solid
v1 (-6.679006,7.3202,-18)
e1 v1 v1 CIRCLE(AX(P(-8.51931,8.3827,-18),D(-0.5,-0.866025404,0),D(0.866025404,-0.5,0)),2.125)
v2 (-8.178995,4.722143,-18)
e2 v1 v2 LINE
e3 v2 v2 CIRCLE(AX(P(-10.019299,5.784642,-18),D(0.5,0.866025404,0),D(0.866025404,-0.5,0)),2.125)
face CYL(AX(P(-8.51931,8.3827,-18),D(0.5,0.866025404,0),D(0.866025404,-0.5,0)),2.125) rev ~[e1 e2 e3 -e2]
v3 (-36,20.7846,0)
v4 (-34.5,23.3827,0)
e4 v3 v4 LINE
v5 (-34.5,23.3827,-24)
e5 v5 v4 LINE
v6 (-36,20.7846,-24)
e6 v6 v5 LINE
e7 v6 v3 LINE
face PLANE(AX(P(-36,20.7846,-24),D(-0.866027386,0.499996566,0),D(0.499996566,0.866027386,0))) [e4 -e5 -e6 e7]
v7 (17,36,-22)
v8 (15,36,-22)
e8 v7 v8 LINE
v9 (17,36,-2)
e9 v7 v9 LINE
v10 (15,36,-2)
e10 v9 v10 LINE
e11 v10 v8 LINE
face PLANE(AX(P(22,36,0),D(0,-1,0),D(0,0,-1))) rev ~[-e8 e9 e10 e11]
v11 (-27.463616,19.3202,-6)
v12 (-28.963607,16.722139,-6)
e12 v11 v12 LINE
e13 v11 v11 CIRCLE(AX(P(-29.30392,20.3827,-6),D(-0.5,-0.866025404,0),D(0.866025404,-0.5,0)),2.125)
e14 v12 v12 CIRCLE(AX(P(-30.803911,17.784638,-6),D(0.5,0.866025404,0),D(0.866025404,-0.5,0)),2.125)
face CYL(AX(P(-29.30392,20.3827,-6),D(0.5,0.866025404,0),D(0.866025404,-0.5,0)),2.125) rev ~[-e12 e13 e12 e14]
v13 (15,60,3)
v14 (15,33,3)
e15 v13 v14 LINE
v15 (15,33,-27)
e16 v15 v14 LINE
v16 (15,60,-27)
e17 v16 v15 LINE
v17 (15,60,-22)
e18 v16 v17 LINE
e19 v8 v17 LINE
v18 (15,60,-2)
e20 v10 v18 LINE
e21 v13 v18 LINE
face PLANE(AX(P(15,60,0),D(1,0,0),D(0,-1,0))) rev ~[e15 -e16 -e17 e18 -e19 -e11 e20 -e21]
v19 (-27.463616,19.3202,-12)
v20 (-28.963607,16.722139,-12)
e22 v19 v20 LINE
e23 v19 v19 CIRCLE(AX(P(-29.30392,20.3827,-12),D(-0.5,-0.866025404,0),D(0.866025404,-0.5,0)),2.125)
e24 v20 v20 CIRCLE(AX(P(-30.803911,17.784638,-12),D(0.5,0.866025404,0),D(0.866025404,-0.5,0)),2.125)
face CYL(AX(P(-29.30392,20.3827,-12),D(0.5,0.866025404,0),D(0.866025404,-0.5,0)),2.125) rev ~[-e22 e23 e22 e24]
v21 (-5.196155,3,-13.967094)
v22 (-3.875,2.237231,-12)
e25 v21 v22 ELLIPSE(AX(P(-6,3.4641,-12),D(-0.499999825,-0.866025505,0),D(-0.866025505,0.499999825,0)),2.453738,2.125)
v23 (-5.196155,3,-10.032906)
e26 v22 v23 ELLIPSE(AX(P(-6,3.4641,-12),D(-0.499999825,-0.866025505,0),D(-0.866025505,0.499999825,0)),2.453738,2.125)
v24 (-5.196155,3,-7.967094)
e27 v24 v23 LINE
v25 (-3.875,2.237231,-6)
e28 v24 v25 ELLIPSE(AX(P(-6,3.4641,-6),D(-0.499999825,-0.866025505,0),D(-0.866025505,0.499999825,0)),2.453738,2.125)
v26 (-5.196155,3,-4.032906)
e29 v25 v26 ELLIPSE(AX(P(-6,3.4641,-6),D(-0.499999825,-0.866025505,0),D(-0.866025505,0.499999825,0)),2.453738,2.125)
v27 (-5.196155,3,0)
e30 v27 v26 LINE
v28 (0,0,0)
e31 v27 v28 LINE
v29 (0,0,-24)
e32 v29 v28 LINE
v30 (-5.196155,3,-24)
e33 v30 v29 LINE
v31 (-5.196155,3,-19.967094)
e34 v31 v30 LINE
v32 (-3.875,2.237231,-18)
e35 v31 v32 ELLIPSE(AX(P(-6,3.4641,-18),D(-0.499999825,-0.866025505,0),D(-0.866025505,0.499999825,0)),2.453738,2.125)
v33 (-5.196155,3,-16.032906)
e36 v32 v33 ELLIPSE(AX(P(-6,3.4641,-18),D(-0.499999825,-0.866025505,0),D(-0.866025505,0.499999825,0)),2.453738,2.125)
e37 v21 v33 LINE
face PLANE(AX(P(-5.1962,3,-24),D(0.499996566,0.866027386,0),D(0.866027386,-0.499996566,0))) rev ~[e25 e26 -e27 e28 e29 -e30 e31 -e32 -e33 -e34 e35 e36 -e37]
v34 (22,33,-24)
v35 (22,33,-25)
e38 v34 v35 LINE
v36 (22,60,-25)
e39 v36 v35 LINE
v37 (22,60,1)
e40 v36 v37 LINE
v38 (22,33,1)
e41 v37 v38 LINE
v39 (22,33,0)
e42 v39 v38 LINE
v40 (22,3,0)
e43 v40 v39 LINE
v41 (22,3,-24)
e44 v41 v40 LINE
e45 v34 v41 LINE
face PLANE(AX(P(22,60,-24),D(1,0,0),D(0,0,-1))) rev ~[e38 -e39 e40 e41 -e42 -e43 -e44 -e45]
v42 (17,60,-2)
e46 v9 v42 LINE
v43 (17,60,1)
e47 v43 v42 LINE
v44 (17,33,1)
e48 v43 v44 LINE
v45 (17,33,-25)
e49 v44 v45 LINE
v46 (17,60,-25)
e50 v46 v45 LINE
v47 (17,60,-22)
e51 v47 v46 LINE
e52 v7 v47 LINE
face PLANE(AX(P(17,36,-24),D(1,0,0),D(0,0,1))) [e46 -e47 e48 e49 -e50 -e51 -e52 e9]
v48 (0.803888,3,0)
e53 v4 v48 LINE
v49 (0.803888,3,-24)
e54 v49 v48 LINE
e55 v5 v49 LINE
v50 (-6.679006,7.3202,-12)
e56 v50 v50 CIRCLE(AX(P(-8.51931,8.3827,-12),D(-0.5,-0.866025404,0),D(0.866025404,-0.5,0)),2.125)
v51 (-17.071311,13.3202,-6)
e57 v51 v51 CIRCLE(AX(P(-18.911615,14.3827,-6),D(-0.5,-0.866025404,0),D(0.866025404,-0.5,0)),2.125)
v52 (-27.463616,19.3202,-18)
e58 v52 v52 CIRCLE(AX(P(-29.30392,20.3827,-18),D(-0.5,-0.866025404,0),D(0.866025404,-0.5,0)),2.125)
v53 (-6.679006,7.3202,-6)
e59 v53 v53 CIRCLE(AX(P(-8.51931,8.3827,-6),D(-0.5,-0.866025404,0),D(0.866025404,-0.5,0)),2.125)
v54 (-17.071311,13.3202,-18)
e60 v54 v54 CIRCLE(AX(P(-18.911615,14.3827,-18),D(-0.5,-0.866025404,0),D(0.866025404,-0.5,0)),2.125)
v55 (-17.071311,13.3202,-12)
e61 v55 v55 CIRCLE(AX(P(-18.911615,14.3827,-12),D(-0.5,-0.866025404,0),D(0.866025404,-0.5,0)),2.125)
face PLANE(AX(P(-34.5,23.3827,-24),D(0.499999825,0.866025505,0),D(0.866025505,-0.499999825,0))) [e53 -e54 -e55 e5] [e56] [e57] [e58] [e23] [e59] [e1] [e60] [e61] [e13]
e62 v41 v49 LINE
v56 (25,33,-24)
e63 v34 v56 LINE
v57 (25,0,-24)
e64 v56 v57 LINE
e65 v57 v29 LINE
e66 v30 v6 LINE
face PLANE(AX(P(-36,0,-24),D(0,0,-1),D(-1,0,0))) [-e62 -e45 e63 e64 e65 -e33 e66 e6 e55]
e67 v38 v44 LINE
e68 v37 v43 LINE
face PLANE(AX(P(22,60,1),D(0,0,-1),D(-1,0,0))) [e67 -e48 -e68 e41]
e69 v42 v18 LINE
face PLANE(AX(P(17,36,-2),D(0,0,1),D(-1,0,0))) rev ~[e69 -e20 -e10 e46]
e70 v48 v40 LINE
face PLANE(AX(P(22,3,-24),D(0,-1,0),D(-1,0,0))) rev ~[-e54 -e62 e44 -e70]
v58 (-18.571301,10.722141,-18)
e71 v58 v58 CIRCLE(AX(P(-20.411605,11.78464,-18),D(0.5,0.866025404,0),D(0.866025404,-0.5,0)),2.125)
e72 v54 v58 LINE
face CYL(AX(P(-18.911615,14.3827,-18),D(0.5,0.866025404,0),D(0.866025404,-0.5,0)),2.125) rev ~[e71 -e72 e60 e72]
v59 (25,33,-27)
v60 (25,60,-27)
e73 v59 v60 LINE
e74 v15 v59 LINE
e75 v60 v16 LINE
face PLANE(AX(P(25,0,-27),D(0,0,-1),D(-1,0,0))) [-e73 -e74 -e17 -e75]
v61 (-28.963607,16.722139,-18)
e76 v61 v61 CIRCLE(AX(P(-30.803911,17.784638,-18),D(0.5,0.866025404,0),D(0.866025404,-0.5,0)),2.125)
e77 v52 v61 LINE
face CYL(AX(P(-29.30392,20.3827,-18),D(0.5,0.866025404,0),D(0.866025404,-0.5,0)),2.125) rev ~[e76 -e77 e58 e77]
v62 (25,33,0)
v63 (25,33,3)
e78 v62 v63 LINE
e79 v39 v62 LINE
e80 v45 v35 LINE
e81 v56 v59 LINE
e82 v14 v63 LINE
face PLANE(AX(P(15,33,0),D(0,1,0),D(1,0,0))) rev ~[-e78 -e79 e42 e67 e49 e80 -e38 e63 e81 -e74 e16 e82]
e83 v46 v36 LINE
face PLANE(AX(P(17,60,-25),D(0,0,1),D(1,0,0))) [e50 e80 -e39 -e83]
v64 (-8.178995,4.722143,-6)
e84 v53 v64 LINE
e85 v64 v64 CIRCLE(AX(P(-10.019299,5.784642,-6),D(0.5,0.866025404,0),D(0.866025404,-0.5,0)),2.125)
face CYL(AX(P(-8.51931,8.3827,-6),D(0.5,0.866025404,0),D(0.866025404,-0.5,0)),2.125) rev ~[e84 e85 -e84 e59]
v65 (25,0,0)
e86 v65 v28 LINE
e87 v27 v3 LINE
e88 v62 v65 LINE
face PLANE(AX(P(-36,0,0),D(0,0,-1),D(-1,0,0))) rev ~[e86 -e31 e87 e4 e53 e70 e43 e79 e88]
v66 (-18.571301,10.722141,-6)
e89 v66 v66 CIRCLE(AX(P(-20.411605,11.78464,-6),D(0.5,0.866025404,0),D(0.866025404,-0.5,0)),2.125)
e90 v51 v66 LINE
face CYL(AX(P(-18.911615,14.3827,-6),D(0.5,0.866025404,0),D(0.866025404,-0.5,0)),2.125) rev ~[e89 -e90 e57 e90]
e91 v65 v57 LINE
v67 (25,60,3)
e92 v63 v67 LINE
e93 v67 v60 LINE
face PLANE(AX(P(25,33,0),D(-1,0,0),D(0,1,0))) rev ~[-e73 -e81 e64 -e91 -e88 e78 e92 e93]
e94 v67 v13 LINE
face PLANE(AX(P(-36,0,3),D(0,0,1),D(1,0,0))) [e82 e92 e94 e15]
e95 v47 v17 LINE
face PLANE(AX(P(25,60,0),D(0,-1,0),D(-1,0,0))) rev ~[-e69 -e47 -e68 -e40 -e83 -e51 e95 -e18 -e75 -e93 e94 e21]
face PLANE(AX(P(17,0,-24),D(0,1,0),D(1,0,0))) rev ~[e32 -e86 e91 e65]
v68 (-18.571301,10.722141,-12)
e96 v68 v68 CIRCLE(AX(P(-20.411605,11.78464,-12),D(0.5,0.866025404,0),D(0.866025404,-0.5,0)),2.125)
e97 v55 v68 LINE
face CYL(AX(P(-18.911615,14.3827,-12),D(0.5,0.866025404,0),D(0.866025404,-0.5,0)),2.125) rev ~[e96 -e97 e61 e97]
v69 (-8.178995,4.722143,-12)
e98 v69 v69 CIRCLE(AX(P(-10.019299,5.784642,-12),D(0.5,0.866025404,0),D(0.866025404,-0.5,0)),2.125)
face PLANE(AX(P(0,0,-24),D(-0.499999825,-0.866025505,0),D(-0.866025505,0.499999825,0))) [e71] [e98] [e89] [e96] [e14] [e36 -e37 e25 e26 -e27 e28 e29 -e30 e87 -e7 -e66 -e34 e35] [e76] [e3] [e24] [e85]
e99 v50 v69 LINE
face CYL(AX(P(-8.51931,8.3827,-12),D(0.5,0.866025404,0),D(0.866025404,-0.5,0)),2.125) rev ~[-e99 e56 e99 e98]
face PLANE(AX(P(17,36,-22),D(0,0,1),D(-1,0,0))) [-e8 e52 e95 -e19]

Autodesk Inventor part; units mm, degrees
ref_plane "YZ Plane" through (0, 0, 0) normal (1, 0, 0) x (0, 1, 0)
ref_plane "XZ Plane" through (0, 0, 0) normal (0, 1, 0) x (-1, 0, 0)
ref_plane "XY Plane" through (0, 0, 0) normal (0, 0, 1) x (1, 0, 0)
sketch "Sketch1" plane through (0, 0, 0) normal (0, 1, 0) x (-1, 0, 0)
  line L0 (0, 0) -> (36, 0)
  line L1 (36, 0) -> (36, -24)
  line L2 (36, -24) -> (0, -24)
  line L3 (0, -24) -> (0, 0)
  dimension "d0" = 36
  dimension "d1" = 24
extrude "Extrusion1" add sketch "Sketch1" along normal blind 3
sketch "Sketch2" plane through (0, 3, 0) normal (0, 1, 0) x (1, 0, 0)
  circle A0 centre (-6, 12) radius 2.125
  point P0 (0, 0)
  dimension "d4" = 4.25
extrude "Extrusion2" cut sketch "Sketch2" against normal through all
pattern_linear "Rectangular Pattern1" count 3 spacing 12 along (-1, 0, 0) count 3 spacing 6 along (0, 0, 1) of "Extrusion2" second direction both ways yes
sketch "Sketch3" plane through (0, 0, 0) normal (1, 0, 0) x (0, 0, -1)
  line L0 (0, 0) -> (24, 0)
  line L1 (24, 0) -> (24, 3)
  line L2 (24, 3) -> (0, 3)
  line L3 (0, 3) -> (0, 0)
extrude "Extrusion3" add sketch "Sketch3" along normal blind 25
sketch "Sketch4" plane through (0, 3, 0) normal (0, 1, 0) x (1, 0, 0)
  line L0 (-36, 24) -> (25, 24) projected
  line L1 (25, 0) -> (22, 0)
  line L2 (22, 0) -> (22, 24)
  line L3 (22, 24) -> (25, 24)
  line L4 (25, 24) -> (25, 0)
  point P0 (0, 0)
  dimension "d15" = 3
extrude "Extrusion4" add sketch "Sketch4" along normal blind 57
sketch "Sketch5" plane through (22, 3, -24) normal (-1, 0, 0) x (0, 0, 1)
  line L0 (24, 57) -> (24, 33)
  line L1 (24, -3) -> (24, 57) projected
  line L2 (0, -3) -> (0, 57) projected
  line L3 (24, 33) -> (0, 33)
  line L4 (0, 33) -> (0, 30)
  line L5 (0, 30) -> (24, 30)
  line L6 (24, 30) -> (24, 33)
  dimension "d18" = 24
  dimension "d19" = 3
extrude "Extrusion5" add sketch "Sketch5" along normal blind 7
sketch "Sketch6" plane through (22, 36, 0) normal (0, 1, 0) x (1, 0, 0)
  line L0 (-7, 0) -> (-5, 0)
  line L1 (-5, 0) -> (-5, 2)
  line L2 (-5, 2) -> (-7, 2)
  line L3 (-7, 2) -> (-7, 0)
  line L4 (-7, 24) -> (-5, 24)
  line L5 (-5, 24) -> (-5, 22)
  line L6 (-5, 22) -> (-7, 22)
  line L7 (-7, 22) -> (-7, 24)
  point P0 (-22, 0)
  dimension "d22" = 2
  dimension "d23" = 2
  dimension "d24" = 2
  dimension "d25" = 2
extrude "Extrusion6" add sketch "Sketch6" along normal blind 24
sketch "Sketch7" plane through (25, 0, -24) normal (0, 0, -1) x (-1, 0, 0)
  line L0 (0, 60) -> (10, 60)
  line L1 (10, 60) -> (10, 33)
  line L2 (10, 33) -> (0, 33)
  line L3 (0, 33) -> (0, 60)
  point P0 (25, 0)
extrude "Extrusion7" add sketch "Sketch7" along normal blind 3
sketch "Sketch8" plane through (-36, 0, 0) normal (0, 0, 1) x (1, 0, 0)
  line L0 (51, 33) -> (61, 33)
  line L1 (61, 33) -> (61, 60)
  line L2 (61, 60) -> (51, 60)
  line L3 (51, 60) -> (51, 33)
  point P0 (36, 0)
extrude "Extrusion8" add sketch "Sketch8" along normal blind 3
sketch "Sketch9" plane through (-36, 0, 0) normal (0, 0, 1) x (1, 0, 0)
  line L0 (0, 0) -> (61, 0)
  line L1 (61, 0) -> (61, 33)
  line L2 (61, 33) -> (0, 33)
  line L3 (0, 33) -> (0, 0)
  point P0 (36, 0)
sketch "Sketch10" plane through (0, 60, 0) normal (0, 1, 0) x (1, 0, 0)
  line L0 (22, 0) -> (22, -1)
  line L1 (22, 24) -> (22, 25)
  line L2 (22, -1) -> (17, -1)
  line L3 (17, -1) -> (17, 25)
  line L4 (17, 25) -> (22, 25)
  line L5 (22, 25) -> (22, -1)
  point P0 (0, 0)
  dimension "d34" = 1
  dimension "d35" = 1
extrude "Extrusion10" cut sketch "Sketch10" against normal through all
sketch "Sketch11" plane through (-36, 0, -24) normal (0, 0, -1) x (-1, 0, 0)
  line L0 (-58, 33) -> (-58, 0) projected
  line L1 (-53, 0) -> (-58, 0)
  line L2 (-58, 0) -> (-58, 3)
  line L3 (-58, 3) -> (-53, 3)
  line L4 (-53, 3) -> (-53, 0)
  point P0 (-36, 0)
extrude "Extrusion11" add sketch "Sketch11" against normal blind 24
sketch "Sketch12" plane through (-36, 0, -24) normal (0, 0, -1) x (-1, 0, 0)
  line L0 (-36, 0) -> (0, 20.7846)
  line L1 (-36, 0) -> (5.5692, 0) construction
  line L2 (0, 20.7846) -> (-1.5, 23.3827)
  line L3 (-1.5, 23.3827) -> (-37.5, 2.5981)
  line L4 (-37.5, 2.5981) -> (-36, 0)
  dimension "d47" = 30
  dimension "d48" = 3
ref_plane "Work Plane1" through (0.3404, 3, 0) normal (0.2240446, 0.9745789, 0) x (0.9745789, -0.2240446, 0)
extrude "Extrusion14" add sketch "Sketch12" against normal blind 24
sketch "Sketch15" plane through (-36, 0, -24) normal (0, 0, -1) x (-1, 0, 0)
  line L0 (0, 3) -> (-30.8038, 3)
  line L1 (0, 3) -> (-30.8038, 3) projected
  line L2 (-30.8038, 3) -> (-36, 0)
  line L3 (-36, 0) -> (0, 0)
  line L4 (0, 0) -> (-61, 0) projected
  line L5 (0, 0) -> (0, 3)
extrude "Extrusion15" cut sketch "Sketch15" against normal through all
sketch "Sketch16" plane through (0.8038, 3, 0) normal (0.5, 0.8660254, 0) x (0.8660254, -0.5, 0)
  line L0 (-40.7654, 24) -> (-40.7654, 0) projected
  line L1 (-40.7654, 12) -> (-34.7654, 12)
  circle A0 centre (-34.7654, 12) radius 2.125
  point P0 (0.8038, 0)
  dimension "d53" = 6
  dimension "d54" = 4.25
extrude "Extrusion16" cut sketch "Sketch16" against normal through all
pattern_linear "Rectangular Pattern2" count 3 spacing 12 along (0.8660254, -0.5, 0) count 3 spacing 6 along (0, 0, 1) of "Extrusion16" second direction both ways yes
equation "\"d5\" = d4"
properties part number "PiCamWalkerMount"
